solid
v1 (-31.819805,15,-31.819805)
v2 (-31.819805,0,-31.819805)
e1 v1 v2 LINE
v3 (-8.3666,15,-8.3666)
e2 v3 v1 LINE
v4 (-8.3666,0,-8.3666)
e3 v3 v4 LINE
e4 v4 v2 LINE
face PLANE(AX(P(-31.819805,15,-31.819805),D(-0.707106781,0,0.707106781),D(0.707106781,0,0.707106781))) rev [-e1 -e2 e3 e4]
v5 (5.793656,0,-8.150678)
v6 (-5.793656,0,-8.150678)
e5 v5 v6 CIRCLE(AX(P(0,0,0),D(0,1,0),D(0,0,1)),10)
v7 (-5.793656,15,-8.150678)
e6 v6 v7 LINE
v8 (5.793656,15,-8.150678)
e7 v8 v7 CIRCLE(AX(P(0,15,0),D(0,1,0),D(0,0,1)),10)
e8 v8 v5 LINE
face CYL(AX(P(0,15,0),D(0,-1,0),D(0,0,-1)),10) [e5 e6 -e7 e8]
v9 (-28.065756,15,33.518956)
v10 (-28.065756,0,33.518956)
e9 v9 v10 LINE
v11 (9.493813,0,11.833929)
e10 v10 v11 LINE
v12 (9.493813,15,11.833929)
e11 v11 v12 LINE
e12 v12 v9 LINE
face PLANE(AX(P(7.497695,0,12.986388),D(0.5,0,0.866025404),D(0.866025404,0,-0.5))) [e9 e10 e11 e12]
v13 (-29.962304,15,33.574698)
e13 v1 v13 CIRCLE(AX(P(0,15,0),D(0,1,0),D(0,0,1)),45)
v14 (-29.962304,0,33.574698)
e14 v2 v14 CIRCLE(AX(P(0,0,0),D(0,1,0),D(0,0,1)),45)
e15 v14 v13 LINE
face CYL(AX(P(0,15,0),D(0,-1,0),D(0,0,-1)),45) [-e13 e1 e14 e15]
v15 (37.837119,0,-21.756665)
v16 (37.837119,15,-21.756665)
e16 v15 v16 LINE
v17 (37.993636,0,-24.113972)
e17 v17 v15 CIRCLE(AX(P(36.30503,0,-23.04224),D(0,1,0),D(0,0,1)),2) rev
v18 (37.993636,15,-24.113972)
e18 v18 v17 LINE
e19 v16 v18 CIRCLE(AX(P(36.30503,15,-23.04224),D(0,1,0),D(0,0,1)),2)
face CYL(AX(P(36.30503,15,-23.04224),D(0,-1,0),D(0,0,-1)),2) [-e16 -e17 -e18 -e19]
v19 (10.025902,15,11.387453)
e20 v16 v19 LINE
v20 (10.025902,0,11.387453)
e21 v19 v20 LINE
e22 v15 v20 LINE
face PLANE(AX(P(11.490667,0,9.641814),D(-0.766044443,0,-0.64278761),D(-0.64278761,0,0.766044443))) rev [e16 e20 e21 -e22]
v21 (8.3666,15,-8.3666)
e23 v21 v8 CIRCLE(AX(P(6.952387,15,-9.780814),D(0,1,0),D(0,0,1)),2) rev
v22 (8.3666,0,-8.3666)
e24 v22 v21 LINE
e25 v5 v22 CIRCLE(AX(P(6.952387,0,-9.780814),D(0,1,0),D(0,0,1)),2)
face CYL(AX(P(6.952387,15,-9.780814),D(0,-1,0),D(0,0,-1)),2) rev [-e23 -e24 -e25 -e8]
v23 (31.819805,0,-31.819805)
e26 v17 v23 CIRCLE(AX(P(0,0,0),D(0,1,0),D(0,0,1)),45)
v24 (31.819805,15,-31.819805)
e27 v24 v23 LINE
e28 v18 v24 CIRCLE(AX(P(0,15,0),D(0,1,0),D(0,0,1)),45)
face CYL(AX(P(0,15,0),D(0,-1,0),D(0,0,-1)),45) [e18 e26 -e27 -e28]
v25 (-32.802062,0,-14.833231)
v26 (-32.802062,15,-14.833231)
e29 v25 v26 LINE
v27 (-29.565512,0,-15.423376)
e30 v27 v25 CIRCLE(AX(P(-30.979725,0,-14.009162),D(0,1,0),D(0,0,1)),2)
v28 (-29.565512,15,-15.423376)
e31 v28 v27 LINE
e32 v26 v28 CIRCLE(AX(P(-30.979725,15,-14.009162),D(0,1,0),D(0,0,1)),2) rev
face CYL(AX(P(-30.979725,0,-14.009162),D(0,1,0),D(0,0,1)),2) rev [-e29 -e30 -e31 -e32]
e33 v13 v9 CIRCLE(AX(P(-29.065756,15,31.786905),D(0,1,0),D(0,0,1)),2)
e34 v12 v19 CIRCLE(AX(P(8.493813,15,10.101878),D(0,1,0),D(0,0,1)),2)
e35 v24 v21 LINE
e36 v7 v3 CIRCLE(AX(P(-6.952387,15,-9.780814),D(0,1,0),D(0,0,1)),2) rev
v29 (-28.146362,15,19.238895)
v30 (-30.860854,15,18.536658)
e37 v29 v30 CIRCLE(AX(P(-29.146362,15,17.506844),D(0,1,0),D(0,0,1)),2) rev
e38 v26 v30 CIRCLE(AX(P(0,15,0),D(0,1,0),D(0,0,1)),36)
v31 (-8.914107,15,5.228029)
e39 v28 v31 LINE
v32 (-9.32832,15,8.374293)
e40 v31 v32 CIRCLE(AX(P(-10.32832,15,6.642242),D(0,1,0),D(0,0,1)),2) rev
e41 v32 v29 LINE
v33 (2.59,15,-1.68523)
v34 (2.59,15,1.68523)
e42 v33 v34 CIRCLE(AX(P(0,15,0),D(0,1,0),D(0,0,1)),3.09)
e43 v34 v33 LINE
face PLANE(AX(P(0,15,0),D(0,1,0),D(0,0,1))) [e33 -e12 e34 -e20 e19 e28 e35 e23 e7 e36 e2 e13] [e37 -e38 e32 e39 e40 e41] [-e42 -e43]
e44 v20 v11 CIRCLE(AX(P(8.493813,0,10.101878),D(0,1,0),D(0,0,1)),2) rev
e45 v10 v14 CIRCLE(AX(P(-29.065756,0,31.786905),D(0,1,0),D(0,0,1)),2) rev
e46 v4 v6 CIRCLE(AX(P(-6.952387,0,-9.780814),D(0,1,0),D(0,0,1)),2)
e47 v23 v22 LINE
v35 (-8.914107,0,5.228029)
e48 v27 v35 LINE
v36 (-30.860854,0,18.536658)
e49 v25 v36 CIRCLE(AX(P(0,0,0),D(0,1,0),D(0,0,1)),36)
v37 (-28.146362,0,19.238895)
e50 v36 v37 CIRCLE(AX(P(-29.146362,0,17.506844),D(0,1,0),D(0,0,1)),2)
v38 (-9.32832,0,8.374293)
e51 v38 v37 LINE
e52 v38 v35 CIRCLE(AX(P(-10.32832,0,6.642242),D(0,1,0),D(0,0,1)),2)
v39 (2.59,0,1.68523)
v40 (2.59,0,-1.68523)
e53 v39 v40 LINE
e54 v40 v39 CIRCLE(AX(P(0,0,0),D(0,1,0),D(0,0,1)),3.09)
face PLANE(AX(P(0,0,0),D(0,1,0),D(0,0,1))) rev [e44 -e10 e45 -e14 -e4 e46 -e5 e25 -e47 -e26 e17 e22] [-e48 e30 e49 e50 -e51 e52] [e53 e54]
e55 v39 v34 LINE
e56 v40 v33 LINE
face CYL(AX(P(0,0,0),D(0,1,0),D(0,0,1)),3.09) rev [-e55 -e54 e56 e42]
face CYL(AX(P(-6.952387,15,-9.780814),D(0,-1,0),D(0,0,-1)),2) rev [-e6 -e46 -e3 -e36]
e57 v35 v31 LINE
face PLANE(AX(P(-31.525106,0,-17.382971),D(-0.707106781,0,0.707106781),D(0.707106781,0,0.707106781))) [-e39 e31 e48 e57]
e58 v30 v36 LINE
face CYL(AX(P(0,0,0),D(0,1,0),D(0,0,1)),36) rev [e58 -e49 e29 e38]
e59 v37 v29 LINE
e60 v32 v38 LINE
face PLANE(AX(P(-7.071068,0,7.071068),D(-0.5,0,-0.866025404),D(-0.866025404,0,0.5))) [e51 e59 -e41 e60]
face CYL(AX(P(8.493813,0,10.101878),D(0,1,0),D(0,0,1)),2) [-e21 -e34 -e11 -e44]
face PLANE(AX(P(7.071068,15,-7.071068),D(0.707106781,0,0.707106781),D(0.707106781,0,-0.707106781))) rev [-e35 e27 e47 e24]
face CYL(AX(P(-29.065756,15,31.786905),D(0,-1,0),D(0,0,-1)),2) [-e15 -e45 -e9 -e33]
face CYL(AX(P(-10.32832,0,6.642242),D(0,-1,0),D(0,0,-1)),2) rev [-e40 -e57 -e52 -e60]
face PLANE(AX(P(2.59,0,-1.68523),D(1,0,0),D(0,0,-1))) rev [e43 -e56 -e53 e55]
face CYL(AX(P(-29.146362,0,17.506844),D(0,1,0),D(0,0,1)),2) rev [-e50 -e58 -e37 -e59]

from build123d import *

# Parameters (mm, degrees)
SKETCH1_R                  = 3
BOSS_EXTRUDE1_DEPTH        = 15
SHAFT_START                = -15
SHAFT_D_DEPTH              = 15
CUT_EXTRUDE1_DEPTH         = 66.3834841531101
BOSS_EXTRUDE3_DEPTH        = 0.9
CUT_EXTRUDE2_DEPTH         = 59.56795722653927
SHAFT_HOLE_EXPANSION_DEPTH = 59.56795722653927
CUT_EXTRUDE4_DEPTH         = 59.56795722653927
FILLET1_R                  = 2


with BuildPart() as part:
    # Sketch1 → Boss-Extrude1 (new body)
    with BuildSketch(Plane(origin=(0, 0, 0), x_dir=(1, 0, 0), z_dir=(0, 1, 0))):
        with BuildLine():
            Line((-31.81980515339447, 31.819805153394796), (-7.071067811865444, 7.071067811865506))
            ThreePointArc((-7.071067811865444, 7.071067811865506), (4.724e-14, 10.000000000000002), (7.071067811865511, 7.071067811865442))
            Line((7.071067811865511, 7.071067811865442), (31.819805153394796, 31.819805153394476))
            ThreePointArc((31.819805153394796, 31.819805153394476), (-2.4807e-13, -44.99999999999999), (-31.81980515339447, 31.819805153394796))
        make_face()
        with Locations(Location((0, 0, 0), (0, 0, 270))):
            Circle(SKETCH1_R, mode=Mode.SUBTRACT)
    extrude(amount=BOSS_EXTRUDE1_DEPTH)

    # Sketch2 → Shaft D (add)
    with BuildSketch(Plane(origin=(0, 15, 0), x_dir=(1, 0, 0), z_dir=(0, 1, 0)).offset(SHAFT_START)):
        with BuildLine():
            Line((2.499999999999999, 1.6583123951777017), (2.499999999999999, -1.6583123951777017))
            ThreePointArc((2.499999999999999, -1.6583123951777017), (3.0000000000000004, 0), (2.499999999999999, 1.6583123951777017))
        make_face()
    extrude(amount=SHAFT_D_DEPTH)

    # Sketch4 → Cut-Extrude1 (cut, through all)
    with BuildSketch(Plane(origin=(0, 15, 0), x_dir=(1, 0, 0), z_dir=(0, 1, 0))):
        with BuildLine():
            Line((11.490666646784653, -9.641814145298108), (45.50378986806941, 30.893447649017453))
            ThreePointArc((45.50378986806941, 30.893447649017453), (34.99275019793601, -42.43238661193652), (-38.99293957205545, -38.78853778540811))
            Line((-38.99293957205545, -38.78853778540811), (11.490666646784653, -9.641814145298108))
        make_face()
    extrude(amount=-CUT_EXTRUDE1_DEPTH, mode=Mode.SUBTRACT)

    # Sketch6 → Boss-Extrude3 (add)
    with BuildSketch(Plane(origin=(7.0476946558942295, 0, 12.206965220240622), x_dir=(0.8660254037844414, 0, -0.4999999999999952), z_dir=(0.4999999999999952, 0, 0.8660254037844414))):
        Polygon((-42.73546536717619, 15), (5.130302149885087, 15), (5.130302149885089, 0), (-42.73546536717619, 0), align=None)
    extrude(amount=BOSS_EXTRUDE3_DEPTH)

    # Sketch7 → Cut-Extrude2 (cut, through all)
    with BuildSketch(Plane(origin=(0, 15, 0), x_dir=(1, 0, 0), z_dir=(0, 1, 0))):
        with BuildLine():
            Line((-31.525106333140414, 17.38297070940953), (-7.071067811865441, -7.07106781186544))
            Line((-7.071067811865441, -7.07106781186544), (-29.802141727564482, -20.19485945606356))
            ThreePointArc((-29.802141727564482, -20.19485945606356), (-35.962218628181056, -1.6488879097460596), (-31.525106333140414, 17.38297070940953))
        make_face()
    extrude(amount=-CUT_EXTRUDE2_DEPTH, mode=Mode.SUBTRACT)

    # Sketch9 → Shaft Hole Expansion (cut, through all)
    with BuildSketch(Plane(origin=(0, 15, 0), x_dir=(1, 0, 0), z_dir=(0, 1, 0))):
        with BuildLine():
            Line((2.5899999999999985, 1.685229954635274), (2.5899999999999985, -1.6852299546352736))
            ThreePointArc((2.5899999999999985, -1.6852299546352736), (-3.09, 3.8e-16), (2.5899999999999985, 1.685229954635274))
        make_face()
    extrude(amount=-SHAFT_HOLE_EXPANSION_DEPTH, mode=Mode.SUBTRACT)

    # Sketch10 → Cut-Extrude4 (cut, through all)
    with BuildSketch(Plane(origin=(0, 15, 0), x_dir=(1, 0, 0), z_dir=(0, 1, 0))):
        Polygon((11.49066664678465, -9.641814145298104), (7.493411323151681, -14.405557537754012), (21.666837443070385, -15.28946640390601), align=None)
    extrude(amount=-CUT_EXTRUDE4_DEPTH, mode=Mode.SUBTRACT)

    # Fillet1
    # the kernel refuses this fillet: 2 mm, written as the material it adds along each edge
    with BuildSketch(Plane(origin=(-29.802141727564482, 15, 20.19485945606356), x_dir=(0.8660254037844384, 0, -0.5000000000000004), z_dir=(0, -1, 0))) as fillet1_piece_1:
        with BuildLine():
            CenterArc((1.9119296968147805, -2.000000000000001), FILLET1_R, 90.00000000000006, 89.00874965826159)
            ThreePointArc((-0.08777100050710222, -1.9654005617043746), (-0.05731387291771985, -0.9821005956140282), (0, 0))
            Line((0, 0), (1.911929696814779, 4e-17))
        make_face()
    extrude(amount=15)
    with BuildSketch(Plane(origin=(-31.525106333140414, 15, -17.382970709409527), x_dir=(-0.44779859611608247, 0, 0.8941344514760997), z_dir=(0, -1, 0))) as fillet1_piece_2:
        with BuildLine():
            CenterArc((2.77241732034655, -1.9984307521616007), FILLET1_R, 87.73015185982399, 110.66731649351249)
            Line((0.8746374046450249, -2.6296449721851296), (0, 0))
            ThreePointArc((0, 0), (1.4258146218925176, 0.02824646109120102), (2.8516292437850255, 6e-17))
        make_face()
    extrude(amount=15)
    with BuildSketch(Plane(origin=(-7.071067811865441, 15, 7.07106781186544), x_dir=(-0.8660254037844387, 0, 0.4999999999999999), z_dir=(0, -1, 0))) as fillet1_piece_3:
        with BuildLine():
            CenterArc((FILLET1_R * 1.30322537284, FILLET1_R), FILLET1_R, 165.00000000000003, 104.99999999999997)
            Line((FILLET1_R * 0.337299546552, FILLET1_R * 1.2588190451), (0, 0))
            Line((0, 0), (FILLET1_R * 1.30322537284, 1e-17))
        make_face()
    extrude(amount=15)
    with BuildSketch(Plane(origin=(-7.071067811865445, 0, -7.071067811865506), x_dir=(-0.7071067811865437, 0, -0.7071067811865515), z_dir=(0, 1, 0))) as fillet1_piece_4:
        with BuildLine():
            CenterArc((1.8321595661992367, -2), FILLET1_R, 89.99999999999999, 80.40593177313956)
            ThreePointArc((-0.13986702816730157, -1.666666666666667), (-0.0350281054503974, -0.8362626027968331), (0, 0))
            Line((0, 0), (1.8321595661992371, 5e-17))
        make_face()
    extrude(amount=15)
    with BuildSketch(Plane(origin=(7.071067811865512, 0, -7.071067811865442), x_dir=(0.7071067811865507, 0, -0.7071067811865444), z_dir=(0, 1, 0))) as fillet1_piece_5:
        with BuildLine():
            CenterArc((1.8321595661992343, 2.0000000000000004), FILLET1_R, 189.59406822686037, 80.40593177313957)
            ThreePointArc((-0.139867028167305, 1.6666666666666698), (-0.03502810545039883, 0.8362626027968333), (0, 0))
            Line((0, 0), (1.8321595661992325, 4e-17))
        make_face()
    extrude(amount=15)
    # the kernel refuses this fillet: 2 mm, written as the material it takes off along each edge
    with BuildSketch(Plane(origin=(-29.512303994630546, -4.175823272127531, 34.35412076723451), x_dir=(-0.49999999999865496, 0, -0.8660254037852152), z_dir=(0, 1, 0))) as fillet1_2_piece_1:
        with BuildLine():
            CenterArc((2.0000000000025833, -1.6703293088479174), FILLET1_R, 123.36701296928852, 56.63298703080011)
            Line((2.58454e-12, -1.6703293088510118), (0, 0))
            Line((0, 0), (0.9000000000009275, 2e-17))
        make_face()
    extrude(amount=23.35164654425506, mode=Mode.SUBTRACT)
    with BuildSketch(Plane(origin=(9.799219929370043, -0.8816349035423467, 11.657601847458647), x_dir=(0.6427876096865316, 0, -0.7660444431189845), z_dir=(0, 1, 0))) as fillet1_2_piece_2:
        with BuildLine():
            CenterArc((FILLET1_R * 0.176326980708, FILLET1_R), FILLET1_R, 249.99999999999906, 20.000000000000284)
            Line((-FILLET1_R * 0.165693162617, FILLET1_R * 0.0603073792141), (0, 0))
            Line((0, 0), (FILLET1_R * 0.176326980708, 1e-17))
        make_face()
    extrude(amount=16.763269807084693, mode=Mode.SUBTRACT)
    with BuildSketch(Plane(origin=(38.76183530710732, 18.67919870008775, -22.858699079883973), x_dir=(-0.5219883581091025, 0, -0.8529526094681715), z_dir=(0, -1, 0))) as fillet1_2_piece_3:
        with BuildLine():
            CenterArc((1.4389754915898811, -1.9997325944085071), FILLET1_R, 89.06305798679442, 72.40266339187922)
            Line((-0.45729180864609936, -1.363988678939587), (0, 0))
            ThreePointArc((0, 0), (0.7358397400175548, 0.00601662580861232), (1.4716794800350999, 0))
        make_face()
    extrude(amount=22.3583974001755, mode=Mode.SUBTRACT)


solid = part.part
